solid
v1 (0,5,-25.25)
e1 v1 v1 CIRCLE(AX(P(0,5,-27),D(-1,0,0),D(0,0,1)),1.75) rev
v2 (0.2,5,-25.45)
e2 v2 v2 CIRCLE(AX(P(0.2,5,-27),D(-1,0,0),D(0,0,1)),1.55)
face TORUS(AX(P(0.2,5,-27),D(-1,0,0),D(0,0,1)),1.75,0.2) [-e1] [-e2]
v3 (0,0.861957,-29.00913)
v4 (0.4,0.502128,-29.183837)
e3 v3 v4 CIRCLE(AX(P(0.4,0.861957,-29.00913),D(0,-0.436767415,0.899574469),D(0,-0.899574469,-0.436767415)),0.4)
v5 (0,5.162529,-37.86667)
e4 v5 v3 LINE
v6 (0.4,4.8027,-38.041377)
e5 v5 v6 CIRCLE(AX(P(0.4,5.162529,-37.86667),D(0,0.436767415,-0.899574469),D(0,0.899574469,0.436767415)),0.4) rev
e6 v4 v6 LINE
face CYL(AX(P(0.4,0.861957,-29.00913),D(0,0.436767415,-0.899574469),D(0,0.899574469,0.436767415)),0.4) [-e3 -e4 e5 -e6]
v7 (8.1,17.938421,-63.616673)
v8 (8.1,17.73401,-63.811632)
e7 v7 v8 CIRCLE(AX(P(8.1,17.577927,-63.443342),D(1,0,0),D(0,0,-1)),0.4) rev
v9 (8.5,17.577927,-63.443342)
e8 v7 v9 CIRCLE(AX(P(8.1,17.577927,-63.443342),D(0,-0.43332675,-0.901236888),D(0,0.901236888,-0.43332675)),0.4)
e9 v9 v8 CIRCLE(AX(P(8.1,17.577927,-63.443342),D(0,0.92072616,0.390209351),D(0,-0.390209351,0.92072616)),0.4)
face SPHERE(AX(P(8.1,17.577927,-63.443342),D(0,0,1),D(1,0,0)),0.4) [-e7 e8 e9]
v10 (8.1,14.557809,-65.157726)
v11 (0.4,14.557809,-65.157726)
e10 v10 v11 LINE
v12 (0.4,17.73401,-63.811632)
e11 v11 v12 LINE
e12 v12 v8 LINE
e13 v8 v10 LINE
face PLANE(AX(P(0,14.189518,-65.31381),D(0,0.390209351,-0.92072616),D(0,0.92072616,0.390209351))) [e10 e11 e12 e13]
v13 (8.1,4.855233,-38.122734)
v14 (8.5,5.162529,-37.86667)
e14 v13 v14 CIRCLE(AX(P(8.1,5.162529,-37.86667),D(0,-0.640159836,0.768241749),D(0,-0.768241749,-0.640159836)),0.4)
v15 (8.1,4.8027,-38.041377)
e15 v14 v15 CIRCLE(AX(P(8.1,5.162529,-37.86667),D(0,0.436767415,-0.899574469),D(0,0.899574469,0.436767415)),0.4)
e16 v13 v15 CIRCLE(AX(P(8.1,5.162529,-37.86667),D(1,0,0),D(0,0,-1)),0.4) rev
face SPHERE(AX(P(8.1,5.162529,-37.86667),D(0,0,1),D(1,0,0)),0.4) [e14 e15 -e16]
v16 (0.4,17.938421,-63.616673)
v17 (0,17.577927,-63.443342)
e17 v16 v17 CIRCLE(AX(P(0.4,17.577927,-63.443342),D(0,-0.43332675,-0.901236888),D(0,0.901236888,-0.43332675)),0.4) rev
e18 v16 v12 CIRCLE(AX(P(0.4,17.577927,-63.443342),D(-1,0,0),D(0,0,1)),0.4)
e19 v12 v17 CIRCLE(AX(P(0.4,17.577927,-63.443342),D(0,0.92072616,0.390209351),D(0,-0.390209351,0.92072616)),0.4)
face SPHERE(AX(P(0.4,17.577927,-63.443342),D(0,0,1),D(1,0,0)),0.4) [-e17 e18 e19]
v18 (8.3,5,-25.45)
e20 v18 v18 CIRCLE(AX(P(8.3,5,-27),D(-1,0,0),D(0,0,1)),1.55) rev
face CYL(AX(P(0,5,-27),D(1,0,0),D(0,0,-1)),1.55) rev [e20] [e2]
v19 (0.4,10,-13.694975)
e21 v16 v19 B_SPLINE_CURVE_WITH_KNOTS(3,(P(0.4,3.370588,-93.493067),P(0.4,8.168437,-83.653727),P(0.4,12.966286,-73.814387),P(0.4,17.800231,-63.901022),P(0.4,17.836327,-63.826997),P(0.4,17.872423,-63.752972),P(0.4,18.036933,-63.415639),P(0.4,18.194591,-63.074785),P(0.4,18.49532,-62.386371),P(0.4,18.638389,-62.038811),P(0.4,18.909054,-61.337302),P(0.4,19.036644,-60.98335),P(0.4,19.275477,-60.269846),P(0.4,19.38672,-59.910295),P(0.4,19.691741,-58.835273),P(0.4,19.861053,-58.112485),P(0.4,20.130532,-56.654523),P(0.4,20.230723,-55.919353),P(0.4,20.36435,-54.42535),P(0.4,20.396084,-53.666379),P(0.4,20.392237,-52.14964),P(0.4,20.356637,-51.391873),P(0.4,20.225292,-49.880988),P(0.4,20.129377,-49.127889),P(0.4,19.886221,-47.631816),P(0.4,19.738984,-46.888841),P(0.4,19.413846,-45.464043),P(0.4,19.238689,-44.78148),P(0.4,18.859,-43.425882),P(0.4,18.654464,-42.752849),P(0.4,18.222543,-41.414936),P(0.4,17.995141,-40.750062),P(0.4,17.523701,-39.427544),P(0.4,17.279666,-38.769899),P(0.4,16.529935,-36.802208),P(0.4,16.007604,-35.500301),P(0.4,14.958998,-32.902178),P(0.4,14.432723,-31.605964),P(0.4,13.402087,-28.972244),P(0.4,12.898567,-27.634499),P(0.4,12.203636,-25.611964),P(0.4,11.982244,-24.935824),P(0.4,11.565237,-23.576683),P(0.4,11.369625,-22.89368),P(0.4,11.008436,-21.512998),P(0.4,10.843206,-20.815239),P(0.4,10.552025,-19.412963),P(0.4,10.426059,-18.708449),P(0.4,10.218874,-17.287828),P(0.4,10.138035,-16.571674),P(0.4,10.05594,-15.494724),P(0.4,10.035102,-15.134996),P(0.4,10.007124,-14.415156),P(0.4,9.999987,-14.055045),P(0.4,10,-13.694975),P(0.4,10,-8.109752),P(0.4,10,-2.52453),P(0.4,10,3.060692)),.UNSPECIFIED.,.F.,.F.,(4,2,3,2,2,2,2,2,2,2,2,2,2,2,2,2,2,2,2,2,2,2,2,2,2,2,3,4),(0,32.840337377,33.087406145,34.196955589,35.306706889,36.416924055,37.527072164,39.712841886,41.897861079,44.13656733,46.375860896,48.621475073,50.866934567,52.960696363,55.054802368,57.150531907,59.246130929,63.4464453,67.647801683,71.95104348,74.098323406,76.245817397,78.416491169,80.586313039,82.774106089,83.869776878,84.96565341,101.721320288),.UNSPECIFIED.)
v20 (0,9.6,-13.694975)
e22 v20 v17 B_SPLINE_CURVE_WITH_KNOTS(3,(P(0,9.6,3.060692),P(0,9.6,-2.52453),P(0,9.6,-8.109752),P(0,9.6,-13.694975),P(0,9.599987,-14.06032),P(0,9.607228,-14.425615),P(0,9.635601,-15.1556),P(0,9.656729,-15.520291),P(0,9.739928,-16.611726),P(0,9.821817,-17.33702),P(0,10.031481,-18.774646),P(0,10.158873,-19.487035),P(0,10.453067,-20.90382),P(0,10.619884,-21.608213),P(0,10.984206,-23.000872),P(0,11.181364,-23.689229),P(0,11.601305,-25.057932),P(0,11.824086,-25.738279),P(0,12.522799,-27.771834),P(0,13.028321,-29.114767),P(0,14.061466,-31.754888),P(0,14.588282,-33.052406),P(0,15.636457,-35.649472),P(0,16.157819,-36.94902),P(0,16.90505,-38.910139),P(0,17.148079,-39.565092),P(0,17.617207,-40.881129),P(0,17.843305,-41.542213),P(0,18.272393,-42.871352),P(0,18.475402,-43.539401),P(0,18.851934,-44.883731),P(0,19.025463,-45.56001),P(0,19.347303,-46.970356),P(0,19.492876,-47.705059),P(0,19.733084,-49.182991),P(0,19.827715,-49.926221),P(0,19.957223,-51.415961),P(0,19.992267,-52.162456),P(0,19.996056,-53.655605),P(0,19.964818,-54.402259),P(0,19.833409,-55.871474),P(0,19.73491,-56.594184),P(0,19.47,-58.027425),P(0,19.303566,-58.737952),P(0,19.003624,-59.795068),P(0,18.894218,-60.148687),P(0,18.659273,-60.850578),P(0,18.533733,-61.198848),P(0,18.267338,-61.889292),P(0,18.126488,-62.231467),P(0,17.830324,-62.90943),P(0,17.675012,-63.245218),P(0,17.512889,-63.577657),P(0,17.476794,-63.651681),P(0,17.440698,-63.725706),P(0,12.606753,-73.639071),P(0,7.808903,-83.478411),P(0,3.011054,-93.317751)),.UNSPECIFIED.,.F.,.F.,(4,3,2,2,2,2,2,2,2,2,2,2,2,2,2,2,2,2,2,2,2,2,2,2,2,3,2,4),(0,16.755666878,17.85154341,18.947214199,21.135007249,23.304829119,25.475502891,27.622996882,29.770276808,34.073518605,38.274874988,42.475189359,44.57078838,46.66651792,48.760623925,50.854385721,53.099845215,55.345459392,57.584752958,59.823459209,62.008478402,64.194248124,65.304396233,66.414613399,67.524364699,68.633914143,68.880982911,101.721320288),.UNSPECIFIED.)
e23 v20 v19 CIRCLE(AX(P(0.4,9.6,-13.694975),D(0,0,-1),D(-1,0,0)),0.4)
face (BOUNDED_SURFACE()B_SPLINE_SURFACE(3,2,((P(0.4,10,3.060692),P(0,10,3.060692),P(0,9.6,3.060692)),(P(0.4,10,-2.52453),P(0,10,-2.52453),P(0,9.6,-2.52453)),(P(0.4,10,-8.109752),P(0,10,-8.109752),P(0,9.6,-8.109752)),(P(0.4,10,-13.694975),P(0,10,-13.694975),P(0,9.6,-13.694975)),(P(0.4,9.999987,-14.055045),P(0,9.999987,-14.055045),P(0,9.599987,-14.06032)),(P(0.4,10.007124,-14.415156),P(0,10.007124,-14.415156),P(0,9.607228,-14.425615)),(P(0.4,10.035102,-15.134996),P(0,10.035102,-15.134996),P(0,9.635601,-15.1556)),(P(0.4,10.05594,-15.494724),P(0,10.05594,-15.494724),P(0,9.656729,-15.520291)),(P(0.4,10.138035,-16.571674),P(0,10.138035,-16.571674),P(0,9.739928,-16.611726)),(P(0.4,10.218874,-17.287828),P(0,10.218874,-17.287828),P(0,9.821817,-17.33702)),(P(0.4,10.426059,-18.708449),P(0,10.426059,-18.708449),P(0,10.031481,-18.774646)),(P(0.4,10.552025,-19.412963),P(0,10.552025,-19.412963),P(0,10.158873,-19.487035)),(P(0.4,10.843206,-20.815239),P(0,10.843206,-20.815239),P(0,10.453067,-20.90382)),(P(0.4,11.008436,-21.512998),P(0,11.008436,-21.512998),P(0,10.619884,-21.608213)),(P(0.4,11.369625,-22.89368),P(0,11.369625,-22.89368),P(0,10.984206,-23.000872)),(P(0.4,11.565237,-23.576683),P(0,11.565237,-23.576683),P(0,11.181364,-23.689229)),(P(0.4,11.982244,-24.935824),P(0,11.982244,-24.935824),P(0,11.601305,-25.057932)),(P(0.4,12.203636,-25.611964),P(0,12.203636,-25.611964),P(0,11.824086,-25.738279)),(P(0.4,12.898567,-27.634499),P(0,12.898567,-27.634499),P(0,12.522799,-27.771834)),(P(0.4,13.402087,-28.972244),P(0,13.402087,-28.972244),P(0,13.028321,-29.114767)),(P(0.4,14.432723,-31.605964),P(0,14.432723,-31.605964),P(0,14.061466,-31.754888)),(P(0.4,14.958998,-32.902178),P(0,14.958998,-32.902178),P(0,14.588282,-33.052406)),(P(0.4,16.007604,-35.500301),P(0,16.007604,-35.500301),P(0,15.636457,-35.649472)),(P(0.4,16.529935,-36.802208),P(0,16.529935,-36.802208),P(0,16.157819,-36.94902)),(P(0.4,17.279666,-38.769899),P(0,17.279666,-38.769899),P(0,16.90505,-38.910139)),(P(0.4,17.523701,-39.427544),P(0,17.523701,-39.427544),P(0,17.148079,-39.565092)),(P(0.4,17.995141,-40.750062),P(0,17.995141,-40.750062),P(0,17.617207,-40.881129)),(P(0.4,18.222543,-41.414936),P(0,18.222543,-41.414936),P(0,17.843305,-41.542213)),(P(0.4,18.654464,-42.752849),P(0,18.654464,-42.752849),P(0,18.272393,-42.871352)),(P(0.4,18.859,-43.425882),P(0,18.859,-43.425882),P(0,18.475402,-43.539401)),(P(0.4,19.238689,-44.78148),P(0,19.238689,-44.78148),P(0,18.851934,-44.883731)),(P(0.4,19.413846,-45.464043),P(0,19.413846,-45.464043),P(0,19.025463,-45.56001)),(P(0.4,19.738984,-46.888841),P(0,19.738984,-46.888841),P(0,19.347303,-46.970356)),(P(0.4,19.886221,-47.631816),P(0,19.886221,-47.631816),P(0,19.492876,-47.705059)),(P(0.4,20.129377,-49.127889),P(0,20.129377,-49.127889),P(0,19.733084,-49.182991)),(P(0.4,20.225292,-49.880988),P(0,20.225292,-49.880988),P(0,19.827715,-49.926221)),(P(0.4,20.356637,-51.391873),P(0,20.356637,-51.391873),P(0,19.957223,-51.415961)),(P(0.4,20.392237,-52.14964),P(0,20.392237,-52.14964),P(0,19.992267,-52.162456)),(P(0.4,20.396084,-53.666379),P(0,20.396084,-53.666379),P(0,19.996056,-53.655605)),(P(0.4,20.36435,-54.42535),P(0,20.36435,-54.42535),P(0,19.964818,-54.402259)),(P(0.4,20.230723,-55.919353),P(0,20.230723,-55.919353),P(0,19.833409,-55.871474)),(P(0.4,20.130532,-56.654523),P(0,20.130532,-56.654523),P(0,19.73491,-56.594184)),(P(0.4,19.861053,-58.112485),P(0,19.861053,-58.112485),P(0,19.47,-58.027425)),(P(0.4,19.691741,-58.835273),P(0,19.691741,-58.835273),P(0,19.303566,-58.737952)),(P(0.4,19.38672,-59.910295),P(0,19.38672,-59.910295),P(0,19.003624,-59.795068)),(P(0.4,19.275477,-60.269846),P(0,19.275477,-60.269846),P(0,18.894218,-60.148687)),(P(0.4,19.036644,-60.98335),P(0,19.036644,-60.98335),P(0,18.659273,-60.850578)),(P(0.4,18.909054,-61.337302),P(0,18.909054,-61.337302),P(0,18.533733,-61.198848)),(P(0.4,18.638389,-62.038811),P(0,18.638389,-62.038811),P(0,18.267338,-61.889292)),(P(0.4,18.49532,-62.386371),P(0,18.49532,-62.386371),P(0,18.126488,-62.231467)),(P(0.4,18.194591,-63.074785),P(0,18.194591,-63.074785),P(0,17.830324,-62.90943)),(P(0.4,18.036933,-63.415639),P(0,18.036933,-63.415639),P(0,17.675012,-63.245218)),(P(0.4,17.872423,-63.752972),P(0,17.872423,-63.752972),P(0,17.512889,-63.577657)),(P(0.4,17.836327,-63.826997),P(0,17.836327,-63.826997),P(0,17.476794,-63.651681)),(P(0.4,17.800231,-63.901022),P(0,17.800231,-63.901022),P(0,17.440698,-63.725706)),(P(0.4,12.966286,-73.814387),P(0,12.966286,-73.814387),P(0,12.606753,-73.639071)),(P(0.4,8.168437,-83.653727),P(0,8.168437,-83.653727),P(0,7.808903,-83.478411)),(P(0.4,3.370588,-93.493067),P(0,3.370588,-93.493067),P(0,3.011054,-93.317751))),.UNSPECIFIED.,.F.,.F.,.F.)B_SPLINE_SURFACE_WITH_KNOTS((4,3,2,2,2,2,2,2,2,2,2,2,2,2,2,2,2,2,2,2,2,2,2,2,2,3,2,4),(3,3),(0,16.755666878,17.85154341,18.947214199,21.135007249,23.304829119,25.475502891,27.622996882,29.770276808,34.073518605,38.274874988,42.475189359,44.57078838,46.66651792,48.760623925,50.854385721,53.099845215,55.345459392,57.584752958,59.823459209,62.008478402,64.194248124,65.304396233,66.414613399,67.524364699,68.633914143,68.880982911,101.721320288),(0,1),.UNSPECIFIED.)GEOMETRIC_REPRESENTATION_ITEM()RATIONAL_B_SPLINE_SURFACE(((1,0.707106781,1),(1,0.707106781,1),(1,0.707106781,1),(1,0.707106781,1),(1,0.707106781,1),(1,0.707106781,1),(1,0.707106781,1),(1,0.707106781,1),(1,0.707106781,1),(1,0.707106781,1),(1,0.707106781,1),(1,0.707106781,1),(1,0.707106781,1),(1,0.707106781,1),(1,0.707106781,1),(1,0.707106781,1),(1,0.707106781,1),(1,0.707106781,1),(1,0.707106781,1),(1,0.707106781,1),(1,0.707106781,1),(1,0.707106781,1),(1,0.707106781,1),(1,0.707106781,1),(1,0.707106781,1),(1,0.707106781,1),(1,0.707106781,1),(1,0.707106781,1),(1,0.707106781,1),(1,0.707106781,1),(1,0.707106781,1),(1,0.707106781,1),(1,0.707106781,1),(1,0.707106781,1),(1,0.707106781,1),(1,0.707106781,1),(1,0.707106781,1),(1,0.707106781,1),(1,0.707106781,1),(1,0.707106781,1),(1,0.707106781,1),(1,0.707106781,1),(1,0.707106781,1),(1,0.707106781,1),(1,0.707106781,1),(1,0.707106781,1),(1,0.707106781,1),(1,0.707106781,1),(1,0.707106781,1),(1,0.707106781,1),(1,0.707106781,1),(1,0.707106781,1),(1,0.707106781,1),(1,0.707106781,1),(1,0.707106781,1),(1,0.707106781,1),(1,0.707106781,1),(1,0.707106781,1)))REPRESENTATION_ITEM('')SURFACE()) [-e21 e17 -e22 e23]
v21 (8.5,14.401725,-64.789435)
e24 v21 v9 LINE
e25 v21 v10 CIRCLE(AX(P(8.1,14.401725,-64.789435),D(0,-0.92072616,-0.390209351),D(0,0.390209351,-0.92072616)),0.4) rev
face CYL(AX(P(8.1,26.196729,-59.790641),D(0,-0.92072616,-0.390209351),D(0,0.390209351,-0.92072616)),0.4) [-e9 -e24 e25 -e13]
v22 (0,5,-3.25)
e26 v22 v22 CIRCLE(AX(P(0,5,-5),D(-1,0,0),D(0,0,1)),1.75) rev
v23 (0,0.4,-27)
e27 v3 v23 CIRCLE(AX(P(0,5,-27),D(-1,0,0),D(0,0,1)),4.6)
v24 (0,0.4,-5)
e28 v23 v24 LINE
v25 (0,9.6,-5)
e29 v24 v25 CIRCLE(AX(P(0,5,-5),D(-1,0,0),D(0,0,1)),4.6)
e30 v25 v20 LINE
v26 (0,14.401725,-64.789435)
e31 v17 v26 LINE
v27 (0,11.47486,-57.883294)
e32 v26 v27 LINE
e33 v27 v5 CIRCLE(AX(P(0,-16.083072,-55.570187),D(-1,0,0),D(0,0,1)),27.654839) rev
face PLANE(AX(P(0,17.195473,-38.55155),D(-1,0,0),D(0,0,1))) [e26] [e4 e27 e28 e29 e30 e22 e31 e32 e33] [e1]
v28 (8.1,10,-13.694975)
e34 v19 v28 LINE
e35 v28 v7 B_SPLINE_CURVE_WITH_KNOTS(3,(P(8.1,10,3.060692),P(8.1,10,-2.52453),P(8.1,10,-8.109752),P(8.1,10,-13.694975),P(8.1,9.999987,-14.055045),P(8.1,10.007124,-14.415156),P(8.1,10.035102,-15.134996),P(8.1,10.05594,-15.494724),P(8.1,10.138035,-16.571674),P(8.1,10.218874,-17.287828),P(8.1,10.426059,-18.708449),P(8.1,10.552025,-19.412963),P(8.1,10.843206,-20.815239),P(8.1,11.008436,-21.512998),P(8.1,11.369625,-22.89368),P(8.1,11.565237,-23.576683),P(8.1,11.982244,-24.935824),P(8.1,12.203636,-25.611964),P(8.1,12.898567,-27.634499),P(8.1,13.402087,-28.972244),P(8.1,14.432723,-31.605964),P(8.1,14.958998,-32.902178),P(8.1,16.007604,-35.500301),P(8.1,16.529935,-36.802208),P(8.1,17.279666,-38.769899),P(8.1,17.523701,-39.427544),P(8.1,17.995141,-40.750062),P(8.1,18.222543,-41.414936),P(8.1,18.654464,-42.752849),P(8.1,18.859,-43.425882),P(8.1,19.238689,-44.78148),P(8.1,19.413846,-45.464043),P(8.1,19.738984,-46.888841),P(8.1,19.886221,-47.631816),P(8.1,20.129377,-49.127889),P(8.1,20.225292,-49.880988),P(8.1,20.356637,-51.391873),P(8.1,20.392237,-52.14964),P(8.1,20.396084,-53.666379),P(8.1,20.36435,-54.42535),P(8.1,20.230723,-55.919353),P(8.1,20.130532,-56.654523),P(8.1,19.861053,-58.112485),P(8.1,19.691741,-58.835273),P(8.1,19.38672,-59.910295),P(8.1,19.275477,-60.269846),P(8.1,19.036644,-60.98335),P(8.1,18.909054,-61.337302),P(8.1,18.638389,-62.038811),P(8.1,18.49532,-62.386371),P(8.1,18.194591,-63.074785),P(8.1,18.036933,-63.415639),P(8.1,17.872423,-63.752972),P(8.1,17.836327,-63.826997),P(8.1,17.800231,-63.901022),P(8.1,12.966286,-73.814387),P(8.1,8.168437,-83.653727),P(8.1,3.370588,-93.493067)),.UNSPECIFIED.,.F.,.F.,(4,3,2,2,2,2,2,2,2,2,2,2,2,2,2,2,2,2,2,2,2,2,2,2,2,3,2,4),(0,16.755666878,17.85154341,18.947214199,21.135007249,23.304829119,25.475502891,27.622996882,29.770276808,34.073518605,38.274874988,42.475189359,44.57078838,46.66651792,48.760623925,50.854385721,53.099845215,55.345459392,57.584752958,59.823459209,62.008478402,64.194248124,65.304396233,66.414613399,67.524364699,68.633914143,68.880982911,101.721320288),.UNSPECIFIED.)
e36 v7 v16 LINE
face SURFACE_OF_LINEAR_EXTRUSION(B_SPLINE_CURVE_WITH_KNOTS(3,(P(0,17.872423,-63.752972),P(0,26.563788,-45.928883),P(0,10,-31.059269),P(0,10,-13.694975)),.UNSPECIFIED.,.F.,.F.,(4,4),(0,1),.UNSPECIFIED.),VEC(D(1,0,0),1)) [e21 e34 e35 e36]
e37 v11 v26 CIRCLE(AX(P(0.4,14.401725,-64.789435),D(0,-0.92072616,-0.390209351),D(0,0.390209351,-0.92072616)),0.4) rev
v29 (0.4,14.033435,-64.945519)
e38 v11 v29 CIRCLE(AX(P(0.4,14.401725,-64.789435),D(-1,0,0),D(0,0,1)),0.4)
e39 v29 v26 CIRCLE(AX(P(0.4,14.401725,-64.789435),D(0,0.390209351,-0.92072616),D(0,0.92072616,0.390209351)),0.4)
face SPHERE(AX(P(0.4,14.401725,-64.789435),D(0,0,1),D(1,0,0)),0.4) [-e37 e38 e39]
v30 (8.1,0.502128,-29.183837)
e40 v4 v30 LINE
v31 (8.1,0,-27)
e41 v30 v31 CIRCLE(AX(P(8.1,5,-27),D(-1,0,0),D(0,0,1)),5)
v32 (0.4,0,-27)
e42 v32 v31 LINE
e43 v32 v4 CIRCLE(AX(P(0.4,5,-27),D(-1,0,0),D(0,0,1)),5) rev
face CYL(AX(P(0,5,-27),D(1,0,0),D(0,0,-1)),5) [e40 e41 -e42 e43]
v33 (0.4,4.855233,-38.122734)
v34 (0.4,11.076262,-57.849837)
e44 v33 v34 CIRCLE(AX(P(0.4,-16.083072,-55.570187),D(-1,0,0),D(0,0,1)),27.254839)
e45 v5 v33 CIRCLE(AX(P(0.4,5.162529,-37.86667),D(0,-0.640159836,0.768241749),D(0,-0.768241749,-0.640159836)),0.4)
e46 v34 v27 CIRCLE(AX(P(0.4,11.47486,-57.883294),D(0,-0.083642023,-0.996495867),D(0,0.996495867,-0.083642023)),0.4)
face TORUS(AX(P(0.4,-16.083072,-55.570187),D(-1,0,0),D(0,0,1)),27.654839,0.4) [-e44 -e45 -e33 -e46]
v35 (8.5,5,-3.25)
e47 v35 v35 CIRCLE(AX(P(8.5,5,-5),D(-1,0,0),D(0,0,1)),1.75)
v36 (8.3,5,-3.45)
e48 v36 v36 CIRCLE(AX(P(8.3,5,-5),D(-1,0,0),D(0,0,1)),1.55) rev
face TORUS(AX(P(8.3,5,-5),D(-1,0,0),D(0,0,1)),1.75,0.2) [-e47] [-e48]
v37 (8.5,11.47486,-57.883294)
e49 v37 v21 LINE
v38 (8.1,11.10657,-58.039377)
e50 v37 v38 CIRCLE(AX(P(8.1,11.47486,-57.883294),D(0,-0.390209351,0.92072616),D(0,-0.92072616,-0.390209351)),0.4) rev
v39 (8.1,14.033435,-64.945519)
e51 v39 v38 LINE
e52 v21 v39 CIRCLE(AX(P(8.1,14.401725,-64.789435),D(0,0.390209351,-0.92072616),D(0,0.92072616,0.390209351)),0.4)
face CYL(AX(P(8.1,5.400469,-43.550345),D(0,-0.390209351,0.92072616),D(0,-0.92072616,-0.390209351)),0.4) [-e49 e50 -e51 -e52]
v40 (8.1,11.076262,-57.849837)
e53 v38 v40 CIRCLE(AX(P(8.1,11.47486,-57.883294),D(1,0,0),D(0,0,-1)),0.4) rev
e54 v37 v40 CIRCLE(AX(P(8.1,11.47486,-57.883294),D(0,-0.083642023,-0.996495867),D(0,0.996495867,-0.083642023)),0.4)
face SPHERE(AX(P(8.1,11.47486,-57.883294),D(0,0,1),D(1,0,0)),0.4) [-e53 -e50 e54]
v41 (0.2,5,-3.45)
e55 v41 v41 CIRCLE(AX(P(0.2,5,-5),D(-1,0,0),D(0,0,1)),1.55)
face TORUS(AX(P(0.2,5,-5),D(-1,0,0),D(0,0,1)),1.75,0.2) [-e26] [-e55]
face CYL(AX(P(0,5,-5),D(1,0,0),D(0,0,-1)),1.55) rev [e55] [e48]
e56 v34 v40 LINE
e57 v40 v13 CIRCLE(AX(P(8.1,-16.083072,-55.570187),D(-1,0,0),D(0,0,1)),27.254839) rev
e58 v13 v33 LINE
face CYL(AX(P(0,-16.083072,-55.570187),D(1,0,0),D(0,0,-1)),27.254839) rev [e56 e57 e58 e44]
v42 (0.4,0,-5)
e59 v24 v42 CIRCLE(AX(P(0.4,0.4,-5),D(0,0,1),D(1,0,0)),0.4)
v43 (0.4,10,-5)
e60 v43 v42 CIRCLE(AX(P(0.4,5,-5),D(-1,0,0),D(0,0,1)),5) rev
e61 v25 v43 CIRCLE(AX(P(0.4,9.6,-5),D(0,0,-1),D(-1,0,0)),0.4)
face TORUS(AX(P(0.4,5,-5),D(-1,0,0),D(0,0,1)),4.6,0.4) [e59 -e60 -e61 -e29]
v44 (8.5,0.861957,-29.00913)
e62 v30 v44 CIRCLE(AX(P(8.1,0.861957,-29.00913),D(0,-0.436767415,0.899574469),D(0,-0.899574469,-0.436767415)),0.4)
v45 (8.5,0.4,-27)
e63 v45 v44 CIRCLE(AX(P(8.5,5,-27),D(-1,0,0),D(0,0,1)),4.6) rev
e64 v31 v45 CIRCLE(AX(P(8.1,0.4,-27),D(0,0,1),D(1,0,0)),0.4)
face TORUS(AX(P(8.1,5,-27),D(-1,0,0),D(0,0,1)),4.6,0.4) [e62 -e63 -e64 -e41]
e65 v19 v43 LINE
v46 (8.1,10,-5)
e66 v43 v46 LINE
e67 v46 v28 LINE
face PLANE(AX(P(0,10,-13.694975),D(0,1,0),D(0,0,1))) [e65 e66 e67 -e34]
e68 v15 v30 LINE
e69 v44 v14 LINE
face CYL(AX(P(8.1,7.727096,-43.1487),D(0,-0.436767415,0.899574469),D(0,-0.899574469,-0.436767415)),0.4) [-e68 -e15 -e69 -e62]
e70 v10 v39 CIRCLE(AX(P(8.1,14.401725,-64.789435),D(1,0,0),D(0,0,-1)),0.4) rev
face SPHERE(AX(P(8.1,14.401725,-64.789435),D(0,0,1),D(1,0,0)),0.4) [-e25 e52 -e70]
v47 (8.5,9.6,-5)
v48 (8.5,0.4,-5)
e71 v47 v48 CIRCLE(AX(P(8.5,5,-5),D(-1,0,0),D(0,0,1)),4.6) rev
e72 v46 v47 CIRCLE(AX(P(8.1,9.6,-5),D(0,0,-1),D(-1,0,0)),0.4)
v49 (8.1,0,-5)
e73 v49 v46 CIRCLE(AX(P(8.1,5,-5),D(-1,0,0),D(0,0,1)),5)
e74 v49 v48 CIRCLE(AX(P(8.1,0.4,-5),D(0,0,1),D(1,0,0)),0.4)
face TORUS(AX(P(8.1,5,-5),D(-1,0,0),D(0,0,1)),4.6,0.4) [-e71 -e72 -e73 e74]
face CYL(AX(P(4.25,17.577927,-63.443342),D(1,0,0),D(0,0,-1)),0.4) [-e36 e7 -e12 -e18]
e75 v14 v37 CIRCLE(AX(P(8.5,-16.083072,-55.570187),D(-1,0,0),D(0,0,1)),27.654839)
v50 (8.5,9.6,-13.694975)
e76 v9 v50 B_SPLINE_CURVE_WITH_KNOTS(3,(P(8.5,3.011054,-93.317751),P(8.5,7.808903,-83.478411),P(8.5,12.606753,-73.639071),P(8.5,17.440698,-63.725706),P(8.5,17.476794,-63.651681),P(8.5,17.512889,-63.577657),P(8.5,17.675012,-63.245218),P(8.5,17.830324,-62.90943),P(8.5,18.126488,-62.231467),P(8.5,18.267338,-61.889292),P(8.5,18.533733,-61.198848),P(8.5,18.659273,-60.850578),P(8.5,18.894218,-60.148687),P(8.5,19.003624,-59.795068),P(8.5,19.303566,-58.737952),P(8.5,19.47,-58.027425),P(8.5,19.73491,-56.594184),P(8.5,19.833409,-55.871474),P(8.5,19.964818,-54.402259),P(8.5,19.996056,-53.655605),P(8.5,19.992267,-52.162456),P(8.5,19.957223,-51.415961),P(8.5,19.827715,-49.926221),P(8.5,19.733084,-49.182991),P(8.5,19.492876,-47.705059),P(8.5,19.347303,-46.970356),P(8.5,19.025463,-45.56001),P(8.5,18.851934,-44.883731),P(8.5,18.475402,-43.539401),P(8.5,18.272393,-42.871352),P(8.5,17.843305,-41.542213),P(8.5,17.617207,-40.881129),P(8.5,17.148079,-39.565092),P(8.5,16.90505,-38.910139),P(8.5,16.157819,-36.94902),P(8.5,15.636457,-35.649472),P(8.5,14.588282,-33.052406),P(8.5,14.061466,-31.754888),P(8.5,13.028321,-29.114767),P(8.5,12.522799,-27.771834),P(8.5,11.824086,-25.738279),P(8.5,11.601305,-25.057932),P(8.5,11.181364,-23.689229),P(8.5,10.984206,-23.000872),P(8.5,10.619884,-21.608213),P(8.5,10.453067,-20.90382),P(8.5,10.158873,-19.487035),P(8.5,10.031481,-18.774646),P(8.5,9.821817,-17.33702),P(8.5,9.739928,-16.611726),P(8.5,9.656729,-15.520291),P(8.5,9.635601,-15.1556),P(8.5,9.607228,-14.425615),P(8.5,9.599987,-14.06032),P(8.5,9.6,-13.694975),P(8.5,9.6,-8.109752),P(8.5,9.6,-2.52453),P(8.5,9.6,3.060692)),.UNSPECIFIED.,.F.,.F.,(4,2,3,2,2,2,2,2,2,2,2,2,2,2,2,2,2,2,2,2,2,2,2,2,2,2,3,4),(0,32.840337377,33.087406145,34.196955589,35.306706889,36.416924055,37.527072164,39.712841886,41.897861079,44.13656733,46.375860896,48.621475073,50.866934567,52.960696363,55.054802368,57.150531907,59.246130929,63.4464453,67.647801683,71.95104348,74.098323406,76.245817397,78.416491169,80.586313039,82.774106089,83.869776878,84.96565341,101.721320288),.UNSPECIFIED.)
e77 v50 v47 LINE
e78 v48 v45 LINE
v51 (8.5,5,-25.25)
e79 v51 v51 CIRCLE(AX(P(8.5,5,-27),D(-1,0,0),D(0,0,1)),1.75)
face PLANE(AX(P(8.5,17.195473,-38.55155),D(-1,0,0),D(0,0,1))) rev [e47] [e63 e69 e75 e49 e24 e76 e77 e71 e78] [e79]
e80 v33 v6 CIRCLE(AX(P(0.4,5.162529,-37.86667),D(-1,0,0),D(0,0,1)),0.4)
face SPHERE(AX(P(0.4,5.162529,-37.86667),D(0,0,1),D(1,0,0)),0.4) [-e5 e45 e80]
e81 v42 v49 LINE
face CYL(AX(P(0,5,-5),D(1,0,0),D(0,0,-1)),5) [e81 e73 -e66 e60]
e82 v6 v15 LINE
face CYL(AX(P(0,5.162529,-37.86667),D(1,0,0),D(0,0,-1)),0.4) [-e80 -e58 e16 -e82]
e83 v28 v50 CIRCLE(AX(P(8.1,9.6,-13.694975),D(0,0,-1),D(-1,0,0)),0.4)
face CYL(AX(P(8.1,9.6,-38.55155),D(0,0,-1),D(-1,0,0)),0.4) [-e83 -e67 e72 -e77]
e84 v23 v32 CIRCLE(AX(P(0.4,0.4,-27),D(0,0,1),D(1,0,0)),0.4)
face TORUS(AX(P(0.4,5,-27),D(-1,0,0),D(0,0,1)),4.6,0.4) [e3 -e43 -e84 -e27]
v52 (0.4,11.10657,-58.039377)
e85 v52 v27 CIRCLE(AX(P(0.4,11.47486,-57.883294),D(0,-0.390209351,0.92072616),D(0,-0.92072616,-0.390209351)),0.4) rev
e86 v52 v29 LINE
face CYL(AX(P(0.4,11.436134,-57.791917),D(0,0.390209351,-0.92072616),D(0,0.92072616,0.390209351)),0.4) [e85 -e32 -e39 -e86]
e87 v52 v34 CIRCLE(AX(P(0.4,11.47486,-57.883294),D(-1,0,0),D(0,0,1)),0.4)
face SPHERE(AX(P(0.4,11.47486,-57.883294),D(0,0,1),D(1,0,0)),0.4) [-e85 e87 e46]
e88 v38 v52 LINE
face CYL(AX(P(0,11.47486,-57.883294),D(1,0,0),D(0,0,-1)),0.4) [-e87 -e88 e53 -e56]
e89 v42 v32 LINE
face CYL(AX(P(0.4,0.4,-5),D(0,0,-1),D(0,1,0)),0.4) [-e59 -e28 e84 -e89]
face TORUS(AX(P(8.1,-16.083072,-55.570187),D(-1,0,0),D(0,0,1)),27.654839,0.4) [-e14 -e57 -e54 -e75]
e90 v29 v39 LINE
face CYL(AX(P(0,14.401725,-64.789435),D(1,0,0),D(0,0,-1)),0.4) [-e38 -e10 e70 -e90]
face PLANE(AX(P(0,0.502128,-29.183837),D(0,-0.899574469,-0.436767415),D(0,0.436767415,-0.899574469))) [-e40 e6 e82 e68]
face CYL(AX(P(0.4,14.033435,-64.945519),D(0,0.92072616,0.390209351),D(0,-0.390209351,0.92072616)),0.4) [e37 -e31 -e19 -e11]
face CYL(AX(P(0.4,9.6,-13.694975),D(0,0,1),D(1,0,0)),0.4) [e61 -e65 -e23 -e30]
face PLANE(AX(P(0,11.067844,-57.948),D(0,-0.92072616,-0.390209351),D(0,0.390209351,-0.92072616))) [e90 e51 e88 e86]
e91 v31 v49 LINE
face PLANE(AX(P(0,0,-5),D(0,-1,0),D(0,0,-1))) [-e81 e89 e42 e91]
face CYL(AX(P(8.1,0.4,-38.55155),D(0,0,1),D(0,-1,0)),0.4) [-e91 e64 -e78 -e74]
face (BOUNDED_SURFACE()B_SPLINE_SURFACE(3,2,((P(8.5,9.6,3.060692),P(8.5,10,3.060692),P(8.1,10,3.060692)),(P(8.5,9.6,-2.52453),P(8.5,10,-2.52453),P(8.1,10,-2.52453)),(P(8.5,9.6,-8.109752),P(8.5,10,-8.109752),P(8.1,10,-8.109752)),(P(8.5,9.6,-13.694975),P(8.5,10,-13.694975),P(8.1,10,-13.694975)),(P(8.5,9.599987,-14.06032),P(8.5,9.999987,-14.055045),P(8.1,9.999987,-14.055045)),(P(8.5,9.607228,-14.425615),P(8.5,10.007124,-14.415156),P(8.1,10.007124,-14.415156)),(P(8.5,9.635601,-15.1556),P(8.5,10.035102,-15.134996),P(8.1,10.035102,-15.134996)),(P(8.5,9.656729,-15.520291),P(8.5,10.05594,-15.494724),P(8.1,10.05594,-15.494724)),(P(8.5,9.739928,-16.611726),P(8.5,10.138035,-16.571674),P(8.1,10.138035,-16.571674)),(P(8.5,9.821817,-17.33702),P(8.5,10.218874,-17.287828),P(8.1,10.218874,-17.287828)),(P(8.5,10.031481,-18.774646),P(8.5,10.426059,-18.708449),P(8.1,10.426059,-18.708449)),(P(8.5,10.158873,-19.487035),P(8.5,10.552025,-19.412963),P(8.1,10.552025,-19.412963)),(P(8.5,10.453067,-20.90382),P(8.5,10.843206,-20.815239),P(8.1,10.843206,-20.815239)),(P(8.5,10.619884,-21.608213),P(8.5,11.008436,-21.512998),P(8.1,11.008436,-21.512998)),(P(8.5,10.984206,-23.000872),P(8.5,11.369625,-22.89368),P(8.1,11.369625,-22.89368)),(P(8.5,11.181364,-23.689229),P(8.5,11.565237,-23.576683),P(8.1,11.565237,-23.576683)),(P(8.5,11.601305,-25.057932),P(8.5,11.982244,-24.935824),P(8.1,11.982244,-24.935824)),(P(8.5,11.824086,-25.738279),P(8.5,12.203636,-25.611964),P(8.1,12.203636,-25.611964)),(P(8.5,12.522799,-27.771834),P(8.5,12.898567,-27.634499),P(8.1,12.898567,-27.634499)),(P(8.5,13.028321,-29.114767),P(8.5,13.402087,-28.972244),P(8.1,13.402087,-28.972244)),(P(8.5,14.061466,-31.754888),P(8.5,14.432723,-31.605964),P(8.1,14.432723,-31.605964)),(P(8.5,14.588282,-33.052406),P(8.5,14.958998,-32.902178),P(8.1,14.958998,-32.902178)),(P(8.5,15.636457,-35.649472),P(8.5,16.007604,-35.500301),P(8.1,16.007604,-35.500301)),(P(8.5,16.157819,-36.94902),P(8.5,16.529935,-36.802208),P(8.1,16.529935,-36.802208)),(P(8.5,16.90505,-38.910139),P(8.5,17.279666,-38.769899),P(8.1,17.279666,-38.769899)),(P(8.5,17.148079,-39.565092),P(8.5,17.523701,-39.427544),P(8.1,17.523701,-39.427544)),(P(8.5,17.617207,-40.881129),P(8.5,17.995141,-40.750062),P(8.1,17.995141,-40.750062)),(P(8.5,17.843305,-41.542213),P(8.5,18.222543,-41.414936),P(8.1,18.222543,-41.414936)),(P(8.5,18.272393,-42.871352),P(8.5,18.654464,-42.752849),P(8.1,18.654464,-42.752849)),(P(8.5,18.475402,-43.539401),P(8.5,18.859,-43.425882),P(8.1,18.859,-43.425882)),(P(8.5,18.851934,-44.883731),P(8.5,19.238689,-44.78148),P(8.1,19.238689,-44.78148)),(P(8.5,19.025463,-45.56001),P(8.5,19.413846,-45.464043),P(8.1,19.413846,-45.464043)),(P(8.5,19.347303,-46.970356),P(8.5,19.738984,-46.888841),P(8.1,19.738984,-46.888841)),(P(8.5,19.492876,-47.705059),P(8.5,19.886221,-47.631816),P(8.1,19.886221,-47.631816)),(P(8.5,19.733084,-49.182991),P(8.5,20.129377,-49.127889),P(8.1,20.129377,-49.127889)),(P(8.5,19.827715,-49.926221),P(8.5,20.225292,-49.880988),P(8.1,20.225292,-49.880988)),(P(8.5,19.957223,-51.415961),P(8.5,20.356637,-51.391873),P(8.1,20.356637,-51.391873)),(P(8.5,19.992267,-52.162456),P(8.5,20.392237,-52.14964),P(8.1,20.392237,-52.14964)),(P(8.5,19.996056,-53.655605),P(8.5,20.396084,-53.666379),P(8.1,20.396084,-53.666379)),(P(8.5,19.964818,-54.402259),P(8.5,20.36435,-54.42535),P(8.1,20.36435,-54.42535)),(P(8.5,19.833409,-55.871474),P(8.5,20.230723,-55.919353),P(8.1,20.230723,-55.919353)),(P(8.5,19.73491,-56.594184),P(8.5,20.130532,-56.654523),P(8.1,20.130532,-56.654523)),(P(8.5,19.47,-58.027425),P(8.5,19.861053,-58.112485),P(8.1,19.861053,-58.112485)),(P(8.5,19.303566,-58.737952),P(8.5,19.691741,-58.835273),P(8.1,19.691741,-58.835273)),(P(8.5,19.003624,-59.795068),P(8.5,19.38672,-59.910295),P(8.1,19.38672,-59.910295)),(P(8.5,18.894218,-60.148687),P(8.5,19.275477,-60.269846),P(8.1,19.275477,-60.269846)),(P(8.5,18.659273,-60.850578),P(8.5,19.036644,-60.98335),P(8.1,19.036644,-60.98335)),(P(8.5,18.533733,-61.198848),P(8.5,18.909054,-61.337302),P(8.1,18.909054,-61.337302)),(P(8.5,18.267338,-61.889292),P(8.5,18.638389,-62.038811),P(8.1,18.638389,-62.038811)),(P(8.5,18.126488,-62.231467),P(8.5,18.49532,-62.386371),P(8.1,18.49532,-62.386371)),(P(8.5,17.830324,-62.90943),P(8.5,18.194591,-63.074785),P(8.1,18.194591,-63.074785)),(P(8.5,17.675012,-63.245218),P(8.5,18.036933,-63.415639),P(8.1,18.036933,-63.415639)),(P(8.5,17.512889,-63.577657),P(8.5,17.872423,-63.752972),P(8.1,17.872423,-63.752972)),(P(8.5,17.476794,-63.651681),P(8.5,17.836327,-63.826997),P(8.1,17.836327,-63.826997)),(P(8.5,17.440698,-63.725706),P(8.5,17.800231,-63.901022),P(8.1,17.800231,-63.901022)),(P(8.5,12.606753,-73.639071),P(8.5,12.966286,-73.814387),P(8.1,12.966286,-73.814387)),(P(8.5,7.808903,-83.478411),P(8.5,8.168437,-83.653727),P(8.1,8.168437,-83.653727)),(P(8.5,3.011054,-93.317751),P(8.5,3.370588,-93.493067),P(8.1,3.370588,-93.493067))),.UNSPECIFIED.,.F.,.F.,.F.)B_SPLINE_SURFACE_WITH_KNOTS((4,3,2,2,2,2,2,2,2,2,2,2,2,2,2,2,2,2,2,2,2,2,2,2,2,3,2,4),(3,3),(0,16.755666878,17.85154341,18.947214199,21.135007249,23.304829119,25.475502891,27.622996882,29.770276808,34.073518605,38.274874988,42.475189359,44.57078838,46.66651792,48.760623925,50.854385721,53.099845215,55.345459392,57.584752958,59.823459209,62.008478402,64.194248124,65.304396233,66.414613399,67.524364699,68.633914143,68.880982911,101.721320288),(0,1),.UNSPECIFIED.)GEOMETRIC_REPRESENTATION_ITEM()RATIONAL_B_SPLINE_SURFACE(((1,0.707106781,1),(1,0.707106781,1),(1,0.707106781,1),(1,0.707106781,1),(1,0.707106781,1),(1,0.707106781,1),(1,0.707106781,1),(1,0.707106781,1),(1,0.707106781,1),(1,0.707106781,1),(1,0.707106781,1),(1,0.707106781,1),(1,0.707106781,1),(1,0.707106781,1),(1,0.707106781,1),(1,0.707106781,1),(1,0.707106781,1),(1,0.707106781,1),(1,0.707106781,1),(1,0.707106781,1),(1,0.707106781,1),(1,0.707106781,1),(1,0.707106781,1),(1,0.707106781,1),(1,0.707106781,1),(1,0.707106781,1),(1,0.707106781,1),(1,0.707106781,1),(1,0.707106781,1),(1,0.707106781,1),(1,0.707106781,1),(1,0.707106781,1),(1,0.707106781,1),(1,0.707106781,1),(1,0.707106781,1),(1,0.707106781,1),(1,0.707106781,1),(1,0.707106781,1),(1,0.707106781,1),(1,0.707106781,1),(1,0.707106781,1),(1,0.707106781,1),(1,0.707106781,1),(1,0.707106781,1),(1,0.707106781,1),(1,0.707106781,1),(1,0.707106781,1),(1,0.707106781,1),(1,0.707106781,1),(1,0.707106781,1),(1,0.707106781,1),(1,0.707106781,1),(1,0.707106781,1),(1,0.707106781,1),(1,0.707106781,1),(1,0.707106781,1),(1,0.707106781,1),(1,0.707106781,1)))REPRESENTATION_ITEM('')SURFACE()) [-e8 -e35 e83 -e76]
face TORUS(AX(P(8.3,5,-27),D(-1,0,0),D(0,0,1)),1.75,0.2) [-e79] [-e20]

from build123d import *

# Parameters (mm, degrees)
SKETCH_1_R            = 1.75
EXTRUDE_1_DEPTH       = 8.5
EXTRUDE_2_OUTLINE_R   = 1.75
EXTRUDE_2_OUTLINE_R_2 = 1.55
EXTRUDE_2_DEPTH       = 8.5
FILLET_1_R            = 0.4
FILLET_2_R            = 0.2


# Read off the part's stored shape, not the designer's step: 凸台-拉伸2
with BuildPart() as part:
    # 草图1 → 凸台-拉伸1 (new body)
    with BuildSketch(Plane(origin=(8.5, 0, 0), x_dir=(0, 0, -1), z_dir=(1, 0, 0))):
        with BuildLine():
            Line((13.694974759, 10), (5, 10))
            ThreePointArc((5, 10), (0, 5), (5, 0))
            Line((5, 0), (27, 0))
            ThreePointArc((27, 0), (28.120410255, 0.12714859), (29.183837075, 0.502127655))
            Line((29.183837075, 0.502127655), (38.08542066, 4.824084077))
            ThreePointArc((38.08542066, 4.824084077), (47.396990541, 9.917410338), (57.948000409, 11.067843667))
            Line((57.948000409, 11.067843667), (65.313809691, 14.189518476))
            Line((65.313809691, 14.189518476), (63.752972286, 17.872423117))
            add(Edge.make_bspline(
                [(63.752972286, 17.872423117), (45.928882678, 26.563787963), (31.059268621, 10), (13.694974759, 10)],
                knots=[0, 0, 0, 0, 1, 1, 1, 1], degree=3))
        make_face()
        with Locations(Location((5, 5, 0), (0, 0, 180))):
            Circle(SKETCH_1_R, mode=Mode.SUBTRACT)
        with Locations(Location((27, 5, 0), (0, 0, 180))):
            Circle(SKETCH_1_R, mode=Mode.SUBTRACT)
    extrude(amount=-EXTRUDE_1_DEPTH)

    # 凸台-拉伸2 outline → 凸台-拉伸2 (add)
    # profile 1 of 2: a face of its own
    with BuildSketch(Plane.YZ):
        with Locations((5, -5)):
            Circle(EXTRUDE_2_OUTLINE_R)
        with Locations((5, -5)):
            Circle(EXTRUDE_2_OUTLINE_R_2, mode=Mode.SUBTRACT)
    # profile 2 of 2: a face of its own
    with BuildSketch(Plane.YZ):
        with Locations((5, -27)):
            Circle(EXTRUDE_2_OUTLINE_R)
        with Locations((5, -27)):
            Circle(EXTRUDE_2_OUTLINE_R_2, mode=Mode.SUBTRACT)
    extrude(amount=EXTRUDE_2_DEPTH)

    # 圆角1
    fillet_1_edges = [part.edges().sort_by_distance(p)[0] for p in [
        (8.5, 9.917410338, -47.396990541),
        (8.5, 2.663105866, -33.634628868),
        (8.5, 0.12714859, -28.120410255),
        (8.5, 0, -16),
        (8.5, 5, 0),
        (8.5, 10, -9.347487379),
        (8.5, 17.192155422, -38.542735392),
        (0, 5, 0),
        (4.25, 17.872423117, -63.752972286),
        (4.25, 14.189518476, -65.313809691),
        (4.25, 11.067843667, -57.948000409),
        (4.25, 4.824084077, -38.08542066),
        (0, 0, -16),
        (0, 0.12714859, -28.120410255),
        (0, 2.663105866, -33.634628868),
        (0, 9.917410338, -47.396990541),
        (0, 12.628681071, -61.63090505),
        (0, 16.030970797, -64.533390989),
        (0, 17.192155422, -38.542735392),
        (0, 10, -9.347487379),
        (8.5, 16.030970797, -64.533390989),
        (8.5, 12.628681071, -61.63090505),
    ]]
    fillet(fillet_1_edges, radius=FILLET_1_R)

    # 圆角2
    fillet_2_edges = [part.edges().sort_by_distance(p)[0] for p in [
        (0, 3.45, -27),
        (8.5, 3.45, -27),
        (0, 3.45, -5),
        (8.5, 3.45, -5),
    ]]
    fillet(fillet_2_edges, radius=FILLET_2_R)


solid = part.part
